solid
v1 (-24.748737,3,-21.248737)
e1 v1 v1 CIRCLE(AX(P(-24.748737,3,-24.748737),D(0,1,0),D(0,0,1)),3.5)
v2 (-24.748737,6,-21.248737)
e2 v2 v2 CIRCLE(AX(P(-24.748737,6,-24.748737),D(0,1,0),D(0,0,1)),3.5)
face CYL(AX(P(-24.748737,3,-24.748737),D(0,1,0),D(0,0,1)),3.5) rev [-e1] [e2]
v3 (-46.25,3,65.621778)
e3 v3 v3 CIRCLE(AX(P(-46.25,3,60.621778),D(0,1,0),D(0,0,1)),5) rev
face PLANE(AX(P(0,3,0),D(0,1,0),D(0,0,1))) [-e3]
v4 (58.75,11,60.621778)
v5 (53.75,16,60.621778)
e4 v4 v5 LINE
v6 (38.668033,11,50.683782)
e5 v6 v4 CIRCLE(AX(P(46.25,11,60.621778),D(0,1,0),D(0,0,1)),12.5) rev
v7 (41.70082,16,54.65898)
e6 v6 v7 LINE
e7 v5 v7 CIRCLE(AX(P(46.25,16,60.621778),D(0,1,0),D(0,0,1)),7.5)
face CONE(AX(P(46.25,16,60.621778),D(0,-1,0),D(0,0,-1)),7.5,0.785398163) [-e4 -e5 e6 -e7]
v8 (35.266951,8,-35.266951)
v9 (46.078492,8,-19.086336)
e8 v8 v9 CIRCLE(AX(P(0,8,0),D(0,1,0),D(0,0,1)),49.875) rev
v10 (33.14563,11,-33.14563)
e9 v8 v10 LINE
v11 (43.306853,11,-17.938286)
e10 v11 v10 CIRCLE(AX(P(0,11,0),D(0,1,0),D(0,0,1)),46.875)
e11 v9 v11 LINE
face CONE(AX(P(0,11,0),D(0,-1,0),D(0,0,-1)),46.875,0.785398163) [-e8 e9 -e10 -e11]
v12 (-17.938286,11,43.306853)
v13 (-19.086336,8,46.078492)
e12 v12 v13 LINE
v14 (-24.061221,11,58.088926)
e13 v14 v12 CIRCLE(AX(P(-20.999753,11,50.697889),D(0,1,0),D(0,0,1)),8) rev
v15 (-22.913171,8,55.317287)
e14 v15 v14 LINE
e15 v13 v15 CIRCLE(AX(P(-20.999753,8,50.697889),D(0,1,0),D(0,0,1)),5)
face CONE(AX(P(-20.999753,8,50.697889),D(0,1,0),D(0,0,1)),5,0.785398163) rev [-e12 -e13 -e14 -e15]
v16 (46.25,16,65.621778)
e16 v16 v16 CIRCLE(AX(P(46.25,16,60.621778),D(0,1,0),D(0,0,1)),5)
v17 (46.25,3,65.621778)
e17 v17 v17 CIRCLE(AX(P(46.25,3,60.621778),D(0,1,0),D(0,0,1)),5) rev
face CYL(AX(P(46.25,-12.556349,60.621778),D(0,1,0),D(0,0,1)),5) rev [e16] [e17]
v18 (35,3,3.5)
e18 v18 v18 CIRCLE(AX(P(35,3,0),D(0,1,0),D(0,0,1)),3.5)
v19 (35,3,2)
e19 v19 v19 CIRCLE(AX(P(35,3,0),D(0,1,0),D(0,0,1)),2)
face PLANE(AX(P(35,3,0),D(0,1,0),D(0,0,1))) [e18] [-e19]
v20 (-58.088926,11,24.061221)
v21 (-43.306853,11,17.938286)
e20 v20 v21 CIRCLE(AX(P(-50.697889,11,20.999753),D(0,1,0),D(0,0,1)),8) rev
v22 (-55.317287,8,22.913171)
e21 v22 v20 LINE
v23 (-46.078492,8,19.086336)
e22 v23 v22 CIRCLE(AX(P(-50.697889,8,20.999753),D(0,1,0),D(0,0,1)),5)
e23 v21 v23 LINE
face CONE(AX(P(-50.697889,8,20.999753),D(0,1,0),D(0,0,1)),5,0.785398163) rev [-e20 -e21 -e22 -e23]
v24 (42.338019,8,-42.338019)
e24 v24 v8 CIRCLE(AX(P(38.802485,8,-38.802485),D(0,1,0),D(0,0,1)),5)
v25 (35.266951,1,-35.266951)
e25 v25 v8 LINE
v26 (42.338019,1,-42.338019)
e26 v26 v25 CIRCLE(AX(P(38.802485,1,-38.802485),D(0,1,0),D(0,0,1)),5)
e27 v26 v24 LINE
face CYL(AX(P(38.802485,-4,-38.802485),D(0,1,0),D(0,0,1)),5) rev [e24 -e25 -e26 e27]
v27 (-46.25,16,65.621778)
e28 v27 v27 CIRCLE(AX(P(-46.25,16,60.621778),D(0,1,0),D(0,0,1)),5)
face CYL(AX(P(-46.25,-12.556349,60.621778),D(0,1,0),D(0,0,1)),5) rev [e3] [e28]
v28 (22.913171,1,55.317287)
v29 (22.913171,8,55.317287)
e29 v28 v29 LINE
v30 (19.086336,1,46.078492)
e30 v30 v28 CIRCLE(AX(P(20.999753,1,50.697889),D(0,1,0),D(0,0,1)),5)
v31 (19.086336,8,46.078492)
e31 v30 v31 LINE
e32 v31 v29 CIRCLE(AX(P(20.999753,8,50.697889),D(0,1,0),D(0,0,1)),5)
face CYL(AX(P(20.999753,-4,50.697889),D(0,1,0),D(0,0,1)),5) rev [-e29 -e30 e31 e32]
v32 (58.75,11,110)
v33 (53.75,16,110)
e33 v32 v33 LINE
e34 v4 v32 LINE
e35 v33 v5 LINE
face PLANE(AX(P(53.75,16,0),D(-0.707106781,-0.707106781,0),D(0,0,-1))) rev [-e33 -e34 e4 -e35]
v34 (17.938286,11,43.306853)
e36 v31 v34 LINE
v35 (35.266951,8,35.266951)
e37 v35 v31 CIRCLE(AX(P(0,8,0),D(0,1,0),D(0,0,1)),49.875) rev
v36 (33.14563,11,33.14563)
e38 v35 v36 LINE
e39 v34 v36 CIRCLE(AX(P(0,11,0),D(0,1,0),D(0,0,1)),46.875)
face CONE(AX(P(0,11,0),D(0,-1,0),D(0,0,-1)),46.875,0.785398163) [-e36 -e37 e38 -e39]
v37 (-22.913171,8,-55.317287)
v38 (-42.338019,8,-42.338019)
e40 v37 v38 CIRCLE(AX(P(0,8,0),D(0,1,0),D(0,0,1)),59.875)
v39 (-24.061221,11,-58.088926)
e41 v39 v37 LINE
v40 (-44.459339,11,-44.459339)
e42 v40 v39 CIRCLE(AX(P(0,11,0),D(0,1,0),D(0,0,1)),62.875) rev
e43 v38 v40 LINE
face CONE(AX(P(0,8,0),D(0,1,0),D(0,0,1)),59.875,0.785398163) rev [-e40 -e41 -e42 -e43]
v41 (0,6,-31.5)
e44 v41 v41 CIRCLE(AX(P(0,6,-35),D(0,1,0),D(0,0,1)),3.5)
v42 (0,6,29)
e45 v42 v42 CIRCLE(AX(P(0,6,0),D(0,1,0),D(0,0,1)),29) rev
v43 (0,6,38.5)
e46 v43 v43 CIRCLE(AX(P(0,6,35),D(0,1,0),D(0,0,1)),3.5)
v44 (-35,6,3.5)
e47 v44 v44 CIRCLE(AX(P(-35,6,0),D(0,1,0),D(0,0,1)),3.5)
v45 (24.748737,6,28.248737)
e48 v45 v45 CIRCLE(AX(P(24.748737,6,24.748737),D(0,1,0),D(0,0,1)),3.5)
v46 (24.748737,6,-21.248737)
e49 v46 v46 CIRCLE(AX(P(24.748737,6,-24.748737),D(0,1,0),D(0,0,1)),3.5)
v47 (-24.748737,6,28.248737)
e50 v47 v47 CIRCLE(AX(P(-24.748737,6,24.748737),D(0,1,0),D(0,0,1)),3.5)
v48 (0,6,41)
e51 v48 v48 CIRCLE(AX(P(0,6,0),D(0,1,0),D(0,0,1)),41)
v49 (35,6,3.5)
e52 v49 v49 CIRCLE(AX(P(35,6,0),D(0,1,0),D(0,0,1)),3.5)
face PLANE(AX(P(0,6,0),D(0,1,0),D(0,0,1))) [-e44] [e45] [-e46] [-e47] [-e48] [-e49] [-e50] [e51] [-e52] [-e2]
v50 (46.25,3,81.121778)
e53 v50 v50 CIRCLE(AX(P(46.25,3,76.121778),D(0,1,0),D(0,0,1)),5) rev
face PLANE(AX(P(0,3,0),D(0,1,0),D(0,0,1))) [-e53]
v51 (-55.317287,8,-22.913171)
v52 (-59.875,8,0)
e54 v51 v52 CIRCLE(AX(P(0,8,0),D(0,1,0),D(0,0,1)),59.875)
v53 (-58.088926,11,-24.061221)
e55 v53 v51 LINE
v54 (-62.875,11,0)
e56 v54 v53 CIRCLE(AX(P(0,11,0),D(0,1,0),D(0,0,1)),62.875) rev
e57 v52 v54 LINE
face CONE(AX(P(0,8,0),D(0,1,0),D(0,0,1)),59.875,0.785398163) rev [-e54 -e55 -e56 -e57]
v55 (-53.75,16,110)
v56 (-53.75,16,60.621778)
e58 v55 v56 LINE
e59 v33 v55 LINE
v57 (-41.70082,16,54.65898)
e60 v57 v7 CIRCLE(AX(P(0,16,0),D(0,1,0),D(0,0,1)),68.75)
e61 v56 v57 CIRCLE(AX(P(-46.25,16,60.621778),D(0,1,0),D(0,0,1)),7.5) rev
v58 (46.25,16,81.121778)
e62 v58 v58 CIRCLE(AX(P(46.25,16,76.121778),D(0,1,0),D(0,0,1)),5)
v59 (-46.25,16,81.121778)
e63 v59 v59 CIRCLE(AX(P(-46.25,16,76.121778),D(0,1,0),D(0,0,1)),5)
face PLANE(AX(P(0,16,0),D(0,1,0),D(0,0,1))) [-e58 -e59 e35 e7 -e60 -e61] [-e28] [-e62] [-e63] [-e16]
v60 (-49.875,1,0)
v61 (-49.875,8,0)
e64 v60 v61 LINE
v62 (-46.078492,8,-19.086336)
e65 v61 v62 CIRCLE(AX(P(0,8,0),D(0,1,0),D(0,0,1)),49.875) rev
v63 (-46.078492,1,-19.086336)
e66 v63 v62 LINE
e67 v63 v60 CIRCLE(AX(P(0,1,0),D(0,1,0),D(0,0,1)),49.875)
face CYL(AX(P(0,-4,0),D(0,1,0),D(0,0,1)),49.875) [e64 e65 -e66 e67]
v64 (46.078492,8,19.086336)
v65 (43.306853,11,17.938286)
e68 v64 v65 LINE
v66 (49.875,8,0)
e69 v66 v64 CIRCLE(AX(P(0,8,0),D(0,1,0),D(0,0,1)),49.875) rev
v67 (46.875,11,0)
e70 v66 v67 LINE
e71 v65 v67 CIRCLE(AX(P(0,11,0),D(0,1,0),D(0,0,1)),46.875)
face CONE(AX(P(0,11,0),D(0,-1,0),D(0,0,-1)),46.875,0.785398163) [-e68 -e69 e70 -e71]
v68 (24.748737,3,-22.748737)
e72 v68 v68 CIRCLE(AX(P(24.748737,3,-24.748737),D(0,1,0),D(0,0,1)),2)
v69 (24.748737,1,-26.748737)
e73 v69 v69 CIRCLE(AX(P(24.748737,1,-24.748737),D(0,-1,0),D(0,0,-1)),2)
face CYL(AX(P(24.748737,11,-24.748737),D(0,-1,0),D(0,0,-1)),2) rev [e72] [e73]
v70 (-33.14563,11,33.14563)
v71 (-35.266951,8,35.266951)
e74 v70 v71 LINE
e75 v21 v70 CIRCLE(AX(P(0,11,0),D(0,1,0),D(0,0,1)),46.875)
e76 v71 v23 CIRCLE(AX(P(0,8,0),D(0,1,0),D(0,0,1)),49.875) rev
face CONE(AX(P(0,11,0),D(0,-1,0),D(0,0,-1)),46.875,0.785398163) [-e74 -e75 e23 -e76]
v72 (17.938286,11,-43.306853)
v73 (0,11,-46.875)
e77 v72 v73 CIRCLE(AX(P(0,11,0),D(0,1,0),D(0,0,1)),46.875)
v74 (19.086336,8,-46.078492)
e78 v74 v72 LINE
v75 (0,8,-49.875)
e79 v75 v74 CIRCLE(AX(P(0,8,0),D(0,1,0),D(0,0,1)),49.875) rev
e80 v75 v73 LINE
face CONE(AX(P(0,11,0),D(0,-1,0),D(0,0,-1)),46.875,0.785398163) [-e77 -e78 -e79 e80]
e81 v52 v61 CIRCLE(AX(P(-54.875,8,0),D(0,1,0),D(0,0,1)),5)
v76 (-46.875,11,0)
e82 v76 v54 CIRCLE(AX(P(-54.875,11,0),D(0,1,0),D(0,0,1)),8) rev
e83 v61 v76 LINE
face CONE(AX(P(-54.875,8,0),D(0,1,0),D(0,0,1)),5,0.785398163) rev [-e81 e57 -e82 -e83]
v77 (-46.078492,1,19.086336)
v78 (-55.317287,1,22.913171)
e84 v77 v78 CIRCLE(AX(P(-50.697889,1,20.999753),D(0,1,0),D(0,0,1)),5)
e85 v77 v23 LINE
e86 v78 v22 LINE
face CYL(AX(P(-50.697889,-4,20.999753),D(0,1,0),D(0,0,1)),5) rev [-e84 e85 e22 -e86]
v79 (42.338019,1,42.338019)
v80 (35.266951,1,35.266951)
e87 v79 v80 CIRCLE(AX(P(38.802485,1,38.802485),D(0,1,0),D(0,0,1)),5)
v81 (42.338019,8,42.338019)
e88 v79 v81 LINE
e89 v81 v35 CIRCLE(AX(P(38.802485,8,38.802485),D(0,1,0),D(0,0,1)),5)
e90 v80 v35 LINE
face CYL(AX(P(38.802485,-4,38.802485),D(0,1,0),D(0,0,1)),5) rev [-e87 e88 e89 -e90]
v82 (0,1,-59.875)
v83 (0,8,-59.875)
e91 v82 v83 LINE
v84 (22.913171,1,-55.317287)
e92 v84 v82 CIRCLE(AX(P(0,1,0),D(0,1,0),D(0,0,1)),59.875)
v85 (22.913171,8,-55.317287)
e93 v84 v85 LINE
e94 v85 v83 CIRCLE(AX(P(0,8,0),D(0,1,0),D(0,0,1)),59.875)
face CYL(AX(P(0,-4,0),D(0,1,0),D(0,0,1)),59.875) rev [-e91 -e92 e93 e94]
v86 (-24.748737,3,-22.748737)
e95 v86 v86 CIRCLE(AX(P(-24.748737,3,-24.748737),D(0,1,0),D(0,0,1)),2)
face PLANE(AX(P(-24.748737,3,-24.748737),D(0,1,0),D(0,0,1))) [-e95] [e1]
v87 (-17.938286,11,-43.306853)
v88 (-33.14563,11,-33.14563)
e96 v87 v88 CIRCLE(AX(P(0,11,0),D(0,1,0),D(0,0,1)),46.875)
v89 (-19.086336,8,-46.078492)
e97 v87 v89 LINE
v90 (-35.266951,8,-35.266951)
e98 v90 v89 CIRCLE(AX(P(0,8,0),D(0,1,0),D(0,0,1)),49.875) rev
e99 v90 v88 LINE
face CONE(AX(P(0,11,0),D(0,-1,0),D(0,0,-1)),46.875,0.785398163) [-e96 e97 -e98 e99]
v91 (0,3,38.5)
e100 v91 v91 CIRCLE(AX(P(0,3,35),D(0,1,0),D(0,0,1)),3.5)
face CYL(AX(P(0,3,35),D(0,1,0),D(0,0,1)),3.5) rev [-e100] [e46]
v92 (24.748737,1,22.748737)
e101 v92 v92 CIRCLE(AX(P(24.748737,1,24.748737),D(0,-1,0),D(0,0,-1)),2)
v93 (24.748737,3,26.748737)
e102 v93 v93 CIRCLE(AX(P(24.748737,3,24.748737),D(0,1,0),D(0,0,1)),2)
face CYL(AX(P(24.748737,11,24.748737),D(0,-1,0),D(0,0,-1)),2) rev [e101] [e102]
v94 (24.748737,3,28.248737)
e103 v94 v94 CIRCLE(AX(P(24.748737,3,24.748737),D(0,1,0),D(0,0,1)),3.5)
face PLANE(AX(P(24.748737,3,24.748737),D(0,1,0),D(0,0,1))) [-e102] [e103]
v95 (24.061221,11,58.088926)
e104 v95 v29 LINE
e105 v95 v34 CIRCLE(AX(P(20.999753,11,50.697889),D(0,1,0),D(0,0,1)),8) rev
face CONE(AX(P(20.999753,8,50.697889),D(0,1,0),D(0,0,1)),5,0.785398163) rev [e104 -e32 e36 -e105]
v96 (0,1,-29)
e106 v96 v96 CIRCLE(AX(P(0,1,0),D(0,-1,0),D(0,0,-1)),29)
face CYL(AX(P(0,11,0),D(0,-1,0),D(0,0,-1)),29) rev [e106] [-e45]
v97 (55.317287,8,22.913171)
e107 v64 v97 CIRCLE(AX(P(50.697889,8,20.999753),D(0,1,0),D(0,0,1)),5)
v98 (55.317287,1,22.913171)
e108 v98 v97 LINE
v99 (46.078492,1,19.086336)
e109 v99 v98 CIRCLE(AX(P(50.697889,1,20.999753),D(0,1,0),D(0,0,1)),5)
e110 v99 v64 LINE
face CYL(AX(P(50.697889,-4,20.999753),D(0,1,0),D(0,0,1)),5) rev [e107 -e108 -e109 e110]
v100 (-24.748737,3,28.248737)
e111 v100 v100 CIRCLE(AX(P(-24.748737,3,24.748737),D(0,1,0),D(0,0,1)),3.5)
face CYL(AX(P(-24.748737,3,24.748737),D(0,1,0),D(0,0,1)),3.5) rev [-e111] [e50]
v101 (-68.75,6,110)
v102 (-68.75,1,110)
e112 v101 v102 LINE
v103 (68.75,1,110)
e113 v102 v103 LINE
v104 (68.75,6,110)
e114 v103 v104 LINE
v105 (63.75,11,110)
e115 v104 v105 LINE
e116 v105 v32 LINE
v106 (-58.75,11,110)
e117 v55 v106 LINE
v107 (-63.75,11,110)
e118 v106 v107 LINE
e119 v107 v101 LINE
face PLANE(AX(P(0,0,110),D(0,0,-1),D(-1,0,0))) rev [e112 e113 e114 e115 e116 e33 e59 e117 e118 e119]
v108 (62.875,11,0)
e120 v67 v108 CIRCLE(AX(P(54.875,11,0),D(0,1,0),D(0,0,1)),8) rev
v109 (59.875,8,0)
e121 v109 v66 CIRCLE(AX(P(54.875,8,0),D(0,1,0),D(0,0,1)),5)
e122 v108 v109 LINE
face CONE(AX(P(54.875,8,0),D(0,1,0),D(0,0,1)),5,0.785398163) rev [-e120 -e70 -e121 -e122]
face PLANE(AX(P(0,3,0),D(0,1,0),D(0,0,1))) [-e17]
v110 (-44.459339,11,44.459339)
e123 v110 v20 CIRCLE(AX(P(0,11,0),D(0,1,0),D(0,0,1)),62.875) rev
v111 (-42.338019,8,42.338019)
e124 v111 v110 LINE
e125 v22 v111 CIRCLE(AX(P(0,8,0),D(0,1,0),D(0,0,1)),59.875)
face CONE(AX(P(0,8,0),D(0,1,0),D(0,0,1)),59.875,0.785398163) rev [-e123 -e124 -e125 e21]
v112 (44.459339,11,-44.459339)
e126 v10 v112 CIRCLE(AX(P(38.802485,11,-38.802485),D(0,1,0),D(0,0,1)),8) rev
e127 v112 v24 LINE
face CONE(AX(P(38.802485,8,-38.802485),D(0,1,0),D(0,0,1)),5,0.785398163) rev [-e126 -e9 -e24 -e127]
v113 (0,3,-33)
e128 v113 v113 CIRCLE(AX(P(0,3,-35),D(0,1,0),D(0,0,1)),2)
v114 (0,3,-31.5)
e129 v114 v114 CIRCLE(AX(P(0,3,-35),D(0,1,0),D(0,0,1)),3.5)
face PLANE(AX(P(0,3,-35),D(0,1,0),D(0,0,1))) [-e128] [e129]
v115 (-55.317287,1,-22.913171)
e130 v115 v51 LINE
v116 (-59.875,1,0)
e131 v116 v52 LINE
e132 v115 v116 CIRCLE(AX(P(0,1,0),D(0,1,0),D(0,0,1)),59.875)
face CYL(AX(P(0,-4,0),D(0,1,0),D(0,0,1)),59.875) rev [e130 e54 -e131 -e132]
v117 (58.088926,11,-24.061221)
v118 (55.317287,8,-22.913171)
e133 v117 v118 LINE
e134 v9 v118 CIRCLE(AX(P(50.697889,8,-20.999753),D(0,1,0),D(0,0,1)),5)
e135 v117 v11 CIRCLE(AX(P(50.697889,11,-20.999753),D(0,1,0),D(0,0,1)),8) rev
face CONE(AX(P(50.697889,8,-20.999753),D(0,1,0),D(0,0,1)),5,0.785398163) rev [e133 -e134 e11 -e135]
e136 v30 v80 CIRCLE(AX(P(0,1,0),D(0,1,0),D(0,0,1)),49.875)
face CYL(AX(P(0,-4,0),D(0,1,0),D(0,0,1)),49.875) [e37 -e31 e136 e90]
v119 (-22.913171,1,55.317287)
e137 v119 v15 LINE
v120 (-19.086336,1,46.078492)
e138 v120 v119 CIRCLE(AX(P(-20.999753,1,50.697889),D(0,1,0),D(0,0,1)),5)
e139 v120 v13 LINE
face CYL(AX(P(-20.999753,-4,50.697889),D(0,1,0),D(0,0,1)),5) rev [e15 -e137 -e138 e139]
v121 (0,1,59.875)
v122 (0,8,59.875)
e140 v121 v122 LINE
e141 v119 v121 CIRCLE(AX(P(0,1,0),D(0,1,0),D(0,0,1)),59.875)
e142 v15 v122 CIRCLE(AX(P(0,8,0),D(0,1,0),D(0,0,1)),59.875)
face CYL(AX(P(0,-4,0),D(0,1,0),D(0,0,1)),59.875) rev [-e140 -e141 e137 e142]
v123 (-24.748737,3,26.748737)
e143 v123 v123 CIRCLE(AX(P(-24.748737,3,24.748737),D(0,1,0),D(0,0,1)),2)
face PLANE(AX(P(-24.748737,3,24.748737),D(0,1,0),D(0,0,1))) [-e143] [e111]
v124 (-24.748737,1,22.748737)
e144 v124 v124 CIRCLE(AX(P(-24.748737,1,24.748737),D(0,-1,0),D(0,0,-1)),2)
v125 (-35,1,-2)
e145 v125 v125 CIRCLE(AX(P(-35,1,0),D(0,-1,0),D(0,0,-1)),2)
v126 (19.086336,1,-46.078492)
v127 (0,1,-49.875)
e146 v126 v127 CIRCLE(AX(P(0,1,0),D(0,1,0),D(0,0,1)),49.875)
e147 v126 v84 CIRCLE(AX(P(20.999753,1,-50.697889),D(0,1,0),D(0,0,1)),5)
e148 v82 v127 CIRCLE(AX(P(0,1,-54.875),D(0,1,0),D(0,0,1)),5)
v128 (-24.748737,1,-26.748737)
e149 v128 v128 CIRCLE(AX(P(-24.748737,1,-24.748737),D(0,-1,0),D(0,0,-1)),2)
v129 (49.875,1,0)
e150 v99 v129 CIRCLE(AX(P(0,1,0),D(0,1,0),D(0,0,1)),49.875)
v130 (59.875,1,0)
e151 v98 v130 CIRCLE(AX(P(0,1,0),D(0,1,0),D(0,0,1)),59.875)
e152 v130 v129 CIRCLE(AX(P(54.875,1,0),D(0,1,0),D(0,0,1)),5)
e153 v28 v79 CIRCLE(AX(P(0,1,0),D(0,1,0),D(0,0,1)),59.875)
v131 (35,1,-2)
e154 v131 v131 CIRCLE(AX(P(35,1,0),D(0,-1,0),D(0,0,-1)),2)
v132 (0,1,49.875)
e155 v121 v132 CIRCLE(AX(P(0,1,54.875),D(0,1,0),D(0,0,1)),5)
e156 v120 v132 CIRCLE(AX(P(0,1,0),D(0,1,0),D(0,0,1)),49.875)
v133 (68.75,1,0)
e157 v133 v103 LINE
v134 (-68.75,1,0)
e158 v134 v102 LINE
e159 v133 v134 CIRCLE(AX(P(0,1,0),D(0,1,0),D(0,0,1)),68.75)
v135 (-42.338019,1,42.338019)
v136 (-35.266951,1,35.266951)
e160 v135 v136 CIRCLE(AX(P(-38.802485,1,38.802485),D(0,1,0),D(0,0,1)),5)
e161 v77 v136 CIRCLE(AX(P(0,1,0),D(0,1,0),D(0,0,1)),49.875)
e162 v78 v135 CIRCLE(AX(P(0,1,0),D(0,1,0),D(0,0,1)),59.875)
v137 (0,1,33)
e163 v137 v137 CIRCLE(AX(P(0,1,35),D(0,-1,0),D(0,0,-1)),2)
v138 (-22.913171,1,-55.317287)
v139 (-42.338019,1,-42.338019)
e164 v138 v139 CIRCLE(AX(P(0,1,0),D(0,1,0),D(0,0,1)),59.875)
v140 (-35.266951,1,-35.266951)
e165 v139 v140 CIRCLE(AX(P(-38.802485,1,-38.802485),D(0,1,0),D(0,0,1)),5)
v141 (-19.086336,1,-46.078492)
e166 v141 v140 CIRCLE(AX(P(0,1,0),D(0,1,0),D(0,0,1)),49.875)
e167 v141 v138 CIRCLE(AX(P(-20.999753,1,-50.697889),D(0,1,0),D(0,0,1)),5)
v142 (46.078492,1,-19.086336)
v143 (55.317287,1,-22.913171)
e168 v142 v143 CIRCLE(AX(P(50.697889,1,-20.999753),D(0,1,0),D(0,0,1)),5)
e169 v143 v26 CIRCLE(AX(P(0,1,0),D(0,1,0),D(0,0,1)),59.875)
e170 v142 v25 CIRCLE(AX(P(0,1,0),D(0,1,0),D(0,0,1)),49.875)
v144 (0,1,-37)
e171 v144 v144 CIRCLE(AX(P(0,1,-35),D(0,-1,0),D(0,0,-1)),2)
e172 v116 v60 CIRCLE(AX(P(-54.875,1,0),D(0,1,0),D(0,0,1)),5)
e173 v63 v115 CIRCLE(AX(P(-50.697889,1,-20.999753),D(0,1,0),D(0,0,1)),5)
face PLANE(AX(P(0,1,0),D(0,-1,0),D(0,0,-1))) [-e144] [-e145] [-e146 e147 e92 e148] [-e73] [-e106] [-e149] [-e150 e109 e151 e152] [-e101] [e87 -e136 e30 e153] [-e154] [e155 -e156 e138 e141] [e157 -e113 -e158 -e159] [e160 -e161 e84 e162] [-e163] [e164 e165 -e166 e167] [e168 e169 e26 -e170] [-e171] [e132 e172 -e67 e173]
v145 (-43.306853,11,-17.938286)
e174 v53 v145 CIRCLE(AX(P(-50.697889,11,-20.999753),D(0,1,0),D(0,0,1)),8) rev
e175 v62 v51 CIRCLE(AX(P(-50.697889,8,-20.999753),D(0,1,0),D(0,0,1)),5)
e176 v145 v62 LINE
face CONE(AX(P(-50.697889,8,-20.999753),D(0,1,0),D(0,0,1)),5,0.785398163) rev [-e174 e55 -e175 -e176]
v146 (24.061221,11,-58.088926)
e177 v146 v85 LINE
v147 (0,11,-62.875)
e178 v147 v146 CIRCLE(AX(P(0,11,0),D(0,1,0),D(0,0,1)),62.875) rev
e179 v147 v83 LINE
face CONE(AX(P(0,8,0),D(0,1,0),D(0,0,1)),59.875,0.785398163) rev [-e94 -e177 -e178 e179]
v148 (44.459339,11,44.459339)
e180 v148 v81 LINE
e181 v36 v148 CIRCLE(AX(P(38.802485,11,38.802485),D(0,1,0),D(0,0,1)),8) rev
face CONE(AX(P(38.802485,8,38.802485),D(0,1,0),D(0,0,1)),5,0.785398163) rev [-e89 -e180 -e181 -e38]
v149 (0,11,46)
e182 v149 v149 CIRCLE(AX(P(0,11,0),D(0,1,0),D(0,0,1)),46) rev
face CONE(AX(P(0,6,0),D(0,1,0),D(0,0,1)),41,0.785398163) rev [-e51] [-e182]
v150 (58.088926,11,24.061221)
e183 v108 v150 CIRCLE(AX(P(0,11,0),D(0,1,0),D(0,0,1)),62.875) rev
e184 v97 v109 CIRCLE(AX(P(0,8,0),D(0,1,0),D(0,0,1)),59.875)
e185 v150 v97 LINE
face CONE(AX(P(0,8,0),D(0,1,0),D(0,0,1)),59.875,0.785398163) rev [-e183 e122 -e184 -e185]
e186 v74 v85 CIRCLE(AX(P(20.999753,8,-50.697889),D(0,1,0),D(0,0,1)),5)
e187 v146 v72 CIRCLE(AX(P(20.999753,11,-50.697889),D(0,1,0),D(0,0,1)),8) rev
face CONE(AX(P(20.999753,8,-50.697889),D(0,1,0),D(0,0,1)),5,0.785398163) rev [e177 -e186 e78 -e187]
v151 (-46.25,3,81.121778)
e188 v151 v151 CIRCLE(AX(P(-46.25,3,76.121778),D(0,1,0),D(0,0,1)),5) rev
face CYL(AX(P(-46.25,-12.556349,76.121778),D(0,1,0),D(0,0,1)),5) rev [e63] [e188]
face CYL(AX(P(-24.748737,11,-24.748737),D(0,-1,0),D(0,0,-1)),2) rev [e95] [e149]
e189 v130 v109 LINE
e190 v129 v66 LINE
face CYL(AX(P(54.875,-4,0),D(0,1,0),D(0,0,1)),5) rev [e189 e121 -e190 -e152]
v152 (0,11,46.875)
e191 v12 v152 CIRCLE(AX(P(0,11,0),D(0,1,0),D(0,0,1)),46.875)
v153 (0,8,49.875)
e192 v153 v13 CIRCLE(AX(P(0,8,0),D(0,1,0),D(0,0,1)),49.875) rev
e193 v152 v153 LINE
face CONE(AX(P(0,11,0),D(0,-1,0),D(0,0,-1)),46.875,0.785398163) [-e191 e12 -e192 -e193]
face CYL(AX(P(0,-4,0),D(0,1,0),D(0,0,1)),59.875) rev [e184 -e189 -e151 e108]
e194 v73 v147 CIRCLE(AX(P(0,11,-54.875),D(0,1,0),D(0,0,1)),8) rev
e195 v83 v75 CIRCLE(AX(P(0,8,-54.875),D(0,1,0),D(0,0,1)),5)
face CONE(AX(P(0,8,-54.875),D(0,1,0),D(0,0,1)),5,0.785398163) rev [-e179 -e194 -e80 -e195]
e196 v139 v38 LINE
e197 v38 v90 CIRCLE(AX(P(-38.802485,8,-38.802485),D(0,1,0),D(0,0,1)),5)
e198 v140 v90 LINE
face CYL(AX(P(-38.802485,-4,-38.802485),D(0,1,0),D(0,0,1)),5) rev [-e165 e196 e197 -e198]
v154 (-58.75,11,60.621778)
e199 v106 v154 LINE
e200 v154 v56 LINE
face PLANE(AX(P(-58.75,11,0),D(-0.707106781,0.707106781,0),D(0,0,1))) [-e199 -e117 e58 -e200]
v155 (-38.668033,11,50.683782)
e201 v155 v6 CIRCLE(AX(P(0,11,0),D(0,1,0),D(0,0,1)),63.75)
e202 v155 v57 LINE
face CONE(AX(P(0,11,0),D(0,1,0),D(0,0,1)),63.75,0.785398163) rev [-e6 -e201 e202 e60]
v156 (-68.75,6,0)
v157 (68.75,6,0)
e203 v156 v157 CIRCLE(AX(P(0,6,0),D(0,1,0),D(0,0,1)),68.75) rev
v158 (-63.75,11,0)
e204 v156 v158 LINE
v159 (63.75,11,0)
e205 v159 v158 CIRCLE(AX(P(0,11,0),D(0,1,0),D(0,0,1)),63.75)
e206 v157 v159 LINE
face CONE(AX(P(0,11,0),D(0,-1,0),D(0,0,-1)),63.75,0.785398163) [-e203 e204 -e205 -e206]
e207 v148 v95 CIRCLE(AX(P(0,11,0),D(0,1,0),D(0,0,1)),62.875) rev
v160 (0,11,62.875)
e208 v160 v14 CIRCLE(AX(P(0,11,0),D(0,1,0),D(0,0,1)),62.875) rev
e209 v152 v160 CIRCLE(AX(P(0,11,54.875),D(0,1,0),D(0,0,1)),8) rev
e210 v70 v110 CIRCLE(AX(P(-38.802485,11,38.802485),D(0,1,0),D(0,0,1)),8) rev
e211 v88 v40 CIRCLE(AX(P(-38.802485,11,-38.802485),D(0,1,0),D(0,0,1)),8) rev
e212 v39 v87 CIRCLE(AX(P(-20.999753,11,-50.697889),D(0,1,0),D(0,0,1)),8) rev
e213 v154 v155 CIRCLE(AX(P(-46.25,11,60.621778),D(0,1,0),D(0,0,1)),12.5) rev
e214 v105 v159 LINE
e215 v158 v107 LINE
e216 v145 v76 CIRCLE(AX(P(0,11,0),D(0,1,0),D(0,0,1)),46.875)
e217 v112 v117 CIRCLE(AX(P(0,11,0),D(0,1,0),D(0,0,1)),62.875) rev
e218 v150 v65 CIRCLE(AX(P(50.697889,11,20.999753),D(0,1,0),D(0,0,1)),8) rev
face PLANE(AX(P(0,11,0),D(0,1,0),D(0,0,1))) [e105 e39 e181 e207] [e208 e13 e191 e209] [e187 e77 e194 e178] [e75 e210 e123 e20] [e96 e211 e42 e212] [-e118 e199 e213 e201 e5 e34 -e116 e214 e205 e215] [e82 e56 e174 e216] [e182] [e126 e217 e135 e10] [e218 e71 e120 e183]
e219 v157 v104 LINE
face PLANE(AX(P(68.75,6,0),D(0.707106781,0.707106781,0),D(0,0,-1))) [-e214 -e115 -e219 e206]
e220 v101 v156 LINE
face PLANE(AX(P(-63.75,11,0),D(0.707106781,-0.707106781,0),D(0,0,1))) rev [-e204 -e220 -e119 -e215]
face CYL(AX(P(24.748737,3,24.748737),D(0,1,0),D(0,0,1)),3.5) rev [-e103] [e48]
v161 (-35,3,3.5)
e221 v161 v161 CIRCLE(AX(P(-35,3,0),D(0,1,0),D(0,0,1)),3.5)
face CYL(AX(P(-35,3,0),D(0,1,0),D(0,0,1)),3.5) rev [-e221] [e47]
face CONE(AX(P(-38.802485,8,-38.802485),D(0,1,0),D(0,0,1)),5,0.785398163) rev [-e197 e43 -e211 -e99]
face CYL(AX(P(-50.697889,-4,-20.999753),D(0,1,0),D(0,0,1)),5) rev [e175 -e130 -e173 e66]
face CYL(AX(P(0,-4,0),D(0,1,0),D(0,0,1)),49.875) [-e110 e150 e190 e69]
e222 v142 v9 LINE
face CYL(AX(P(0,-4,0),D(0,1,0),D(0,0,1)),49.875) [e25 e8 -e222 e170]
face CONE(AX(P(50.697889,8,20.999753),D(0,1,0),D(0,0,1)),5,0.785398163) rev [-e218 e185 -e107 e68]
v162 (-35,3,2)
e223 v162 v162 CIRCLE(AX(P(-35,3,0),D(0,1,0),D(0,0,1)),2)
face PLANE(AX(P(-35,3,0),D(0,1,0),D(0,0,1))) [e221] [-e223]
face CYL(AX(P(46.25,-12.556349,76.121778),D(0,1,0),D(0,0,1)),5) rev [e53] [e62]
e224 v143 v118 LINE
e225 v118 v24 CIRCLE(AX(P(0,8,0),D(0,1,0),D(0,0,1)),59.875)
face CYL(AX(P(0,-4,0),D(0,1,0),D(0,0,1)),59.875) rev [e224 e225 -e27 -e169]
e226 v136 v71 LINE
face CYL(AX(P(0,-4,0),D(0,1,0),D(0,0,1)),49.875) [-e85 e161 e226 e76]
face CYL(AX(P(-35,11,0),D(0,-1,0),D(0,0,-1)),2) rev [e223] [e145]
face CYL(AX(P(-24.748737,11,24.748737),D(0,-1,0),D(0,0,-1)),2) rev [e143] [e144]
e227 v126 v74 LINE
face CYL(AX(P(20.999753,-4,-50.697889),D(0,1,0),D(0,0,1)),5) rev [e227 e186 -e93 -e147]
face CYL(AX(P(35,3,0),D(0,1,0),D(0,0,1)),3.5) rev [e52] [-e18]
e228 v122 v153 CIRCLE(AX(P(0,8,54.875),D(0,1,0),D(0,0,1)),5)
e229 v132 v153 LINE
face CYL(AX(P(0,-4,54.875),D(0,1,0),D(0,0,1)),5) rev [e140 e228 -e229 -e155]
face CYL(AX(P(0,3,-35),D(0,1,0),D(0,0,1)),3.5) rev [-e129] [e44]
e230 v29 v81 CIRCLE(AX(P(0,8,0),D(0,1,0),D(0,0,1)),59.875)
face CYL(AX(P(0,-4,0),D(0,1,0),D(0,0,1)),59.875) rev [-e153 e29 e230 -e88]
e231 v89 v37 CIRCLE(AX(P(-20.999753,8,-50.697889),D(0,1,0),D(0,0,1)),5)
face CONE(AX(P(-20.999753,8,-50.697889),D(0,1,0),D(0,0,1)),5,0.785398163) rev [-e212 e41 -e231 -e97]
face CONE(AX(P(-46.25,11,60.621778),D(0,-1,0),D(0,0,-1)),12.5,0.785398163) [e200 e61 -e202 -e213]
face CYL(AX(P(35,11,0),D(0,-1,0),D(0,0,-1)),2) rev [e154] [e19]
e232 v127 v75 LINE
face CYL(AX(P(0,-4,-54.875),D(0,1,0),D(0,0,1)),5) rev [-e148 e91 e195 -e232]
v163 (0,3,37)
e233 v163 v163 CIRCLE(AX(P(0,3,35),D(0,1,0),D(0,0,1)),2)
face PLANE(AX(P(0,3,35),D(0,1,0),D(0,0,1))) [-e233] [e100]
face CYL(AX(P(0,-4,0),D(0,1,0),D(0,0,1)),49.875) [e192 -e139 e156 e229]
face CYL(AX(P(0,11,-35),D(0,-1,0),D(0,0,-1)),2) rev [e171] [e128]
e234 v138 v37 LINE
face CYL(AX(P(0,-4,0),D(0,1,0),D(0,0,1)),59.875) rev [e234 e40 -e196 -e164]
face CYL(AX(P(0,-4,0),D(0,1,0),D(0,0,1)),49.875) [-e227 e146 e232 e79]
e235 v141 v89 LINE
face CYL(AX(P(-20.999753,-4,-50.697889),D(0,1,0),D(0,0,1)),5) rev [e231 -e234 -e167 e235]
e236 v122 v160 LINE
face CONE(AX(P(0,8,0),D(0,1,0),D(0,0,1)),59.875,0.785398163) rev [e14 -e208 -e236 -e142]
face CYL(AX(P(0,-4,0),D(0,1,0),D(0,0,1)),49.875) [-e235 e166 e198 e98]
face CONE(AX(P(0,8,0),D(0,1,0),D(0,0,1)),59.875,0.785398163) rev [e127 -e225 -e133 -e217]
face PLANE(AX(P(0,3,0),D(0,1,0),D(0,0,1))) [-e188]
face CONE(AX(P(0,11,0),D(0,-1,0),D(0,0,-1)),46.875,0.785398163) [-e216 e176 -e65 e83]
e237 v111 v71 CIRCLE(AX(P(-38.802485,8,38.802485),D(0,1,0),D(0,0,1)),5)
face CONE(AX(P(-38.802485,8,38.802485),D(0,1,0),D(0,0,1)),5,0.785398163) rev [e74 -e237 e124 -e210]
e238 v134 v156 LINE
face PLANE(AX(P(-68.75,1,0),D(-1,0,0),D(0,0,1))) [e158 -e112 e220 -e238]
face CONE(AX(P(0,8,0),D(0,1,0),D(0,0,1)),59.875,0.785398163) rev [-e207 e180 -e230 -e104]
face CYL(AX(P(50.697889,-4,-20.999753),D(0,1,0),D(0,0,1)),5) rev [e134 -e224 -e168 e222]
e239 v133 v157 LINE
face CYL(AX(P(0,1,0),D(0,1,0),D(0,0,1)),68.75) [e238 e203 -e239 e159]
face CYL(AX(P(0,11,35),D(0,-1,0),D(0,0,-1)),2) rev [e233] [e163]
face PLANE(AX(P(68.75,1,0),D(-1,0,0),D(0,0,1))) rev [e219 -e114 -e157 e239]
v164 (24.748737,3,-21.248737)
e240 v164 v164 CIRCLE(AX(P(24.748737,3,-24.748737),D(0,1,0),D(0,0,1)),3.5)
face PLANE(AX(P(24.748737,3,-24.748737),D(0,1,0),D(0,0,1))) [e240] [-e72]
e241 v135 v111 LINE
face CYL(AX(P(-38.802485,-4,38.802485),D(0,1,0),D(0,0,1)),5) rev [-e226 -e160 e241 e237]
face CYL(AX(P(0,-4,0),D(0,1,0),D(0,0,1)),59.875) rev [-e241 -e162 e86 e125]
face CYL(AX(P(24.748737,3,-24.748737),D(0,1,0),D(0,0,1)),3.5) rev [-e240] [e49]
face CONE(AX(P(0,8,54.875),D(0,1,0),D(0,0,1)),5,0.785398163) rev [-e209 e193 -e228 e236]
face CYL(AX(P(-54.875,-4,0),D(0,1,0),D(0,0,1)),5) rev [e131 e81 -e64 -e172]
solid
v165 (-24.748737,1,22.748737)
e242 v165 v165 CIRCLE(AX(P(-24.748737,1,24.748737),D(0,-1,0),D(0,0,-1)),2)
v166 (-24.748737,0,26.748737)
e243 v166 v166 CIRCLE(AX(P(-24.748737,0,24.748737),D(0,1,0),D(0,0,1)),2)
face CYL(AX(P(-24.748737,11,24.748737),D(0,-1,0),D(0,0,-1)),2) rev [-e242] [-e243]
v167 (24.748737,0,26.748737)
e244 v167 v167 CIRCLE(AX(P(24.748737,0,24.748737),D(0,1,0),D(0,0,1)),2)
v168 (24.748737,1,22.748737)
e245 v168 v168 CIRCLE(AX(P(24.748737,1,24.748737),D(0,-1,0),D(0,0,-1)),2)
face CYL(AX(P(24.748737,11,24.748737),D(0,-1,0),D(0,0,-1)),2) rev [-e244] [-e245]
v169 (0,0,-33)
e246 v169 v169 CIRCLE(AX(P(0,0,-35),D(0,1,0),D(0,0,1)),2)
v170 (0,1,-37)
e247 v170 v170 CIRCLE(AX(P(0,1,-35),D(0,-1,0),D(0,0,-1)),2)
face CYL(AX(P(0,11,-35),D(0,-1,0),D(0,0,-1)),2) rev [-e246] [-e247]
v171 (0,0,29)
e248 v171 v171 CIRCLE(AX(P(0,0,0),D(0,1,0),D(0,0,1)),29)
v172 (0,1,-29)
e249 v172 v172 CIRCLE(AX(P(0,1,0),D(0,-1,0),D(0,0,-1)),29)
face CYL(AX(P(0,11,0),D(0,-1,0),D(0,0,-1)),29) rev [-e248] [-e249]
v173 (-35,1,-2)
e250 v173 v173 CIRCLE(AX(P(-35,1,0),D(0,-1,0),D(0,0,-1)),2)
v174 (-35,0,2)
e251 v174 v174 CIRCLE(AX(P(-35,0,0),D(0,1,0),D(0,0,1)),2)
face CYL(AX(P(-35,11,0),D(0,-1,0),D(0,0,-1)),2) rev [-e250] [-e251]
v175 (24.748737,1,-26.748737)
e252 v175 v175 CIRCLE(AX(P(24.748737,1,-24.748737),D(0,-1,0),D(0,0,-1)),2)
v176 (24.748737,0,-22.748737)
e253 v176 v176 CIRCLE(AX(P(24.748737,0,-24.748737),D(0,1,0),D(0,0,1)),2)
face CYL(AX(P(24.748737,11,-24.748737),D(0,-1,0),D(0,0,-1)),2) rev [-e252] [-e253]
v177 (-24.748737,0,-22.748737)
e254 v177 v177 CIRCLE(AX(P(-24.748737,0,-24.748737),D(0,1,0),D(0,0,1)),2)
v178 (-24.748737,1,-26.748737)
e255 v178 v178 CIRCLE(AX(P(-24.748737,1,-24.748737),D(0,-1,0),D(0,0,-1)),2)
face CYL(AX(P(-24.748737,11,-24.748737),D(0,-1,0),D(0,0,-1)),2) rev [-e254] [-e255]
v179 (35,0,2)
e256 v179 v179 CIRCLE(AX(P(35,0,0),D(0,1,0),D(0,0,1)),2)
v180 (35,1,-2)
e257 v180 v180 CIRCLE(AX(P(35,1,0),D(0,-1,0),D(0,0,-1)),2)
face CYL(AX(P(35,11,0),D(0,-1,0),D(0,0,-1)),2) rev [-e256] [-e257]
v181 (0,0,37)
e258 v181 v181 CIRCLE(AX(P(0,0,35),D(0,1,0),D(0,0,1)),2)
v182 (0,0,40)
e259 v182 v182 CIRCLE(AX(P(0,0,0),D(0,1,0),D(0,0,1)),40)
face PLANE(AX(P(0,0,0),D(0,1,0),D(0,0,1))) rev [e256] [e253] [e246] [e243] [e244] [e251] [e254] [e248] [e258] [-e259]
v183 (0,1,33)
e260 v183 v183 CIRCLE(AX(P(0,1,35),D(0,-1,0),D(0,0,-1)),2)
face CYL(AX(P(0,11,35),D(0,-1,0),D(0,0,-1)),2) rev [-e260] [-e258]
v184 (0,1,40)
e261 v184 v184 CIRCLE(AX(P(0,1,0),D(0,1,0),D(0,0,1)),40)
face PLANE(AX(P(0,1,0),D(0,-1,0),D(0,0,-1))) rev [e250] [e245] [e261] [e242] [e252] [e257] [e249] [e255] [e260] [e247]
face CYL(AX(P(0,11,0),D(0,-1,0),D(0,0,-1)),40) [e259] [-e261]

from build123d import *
from build123d.topology import SkipClean

# Parameters (mm, degrees)
SKETCH1_R           = 40
SKETCH1_R_2         = 2
SKETCH1_R_3         = 29
BOSS_EXTRUDE1_DEPTH = 11
BOSS_EXTRUDE2_START = -10
SKETCH3_R           = 40
BOSS_EXTRUDE2_DEPTH = 10
SKETCH4_R           = 41
CUT_EXTRUDE2_DEPTH  = 5
CHAMFER2_SIZE       = 5
CHAMFER4_SIZE       = 5
CUT_EXTRUDE4_DEPTH  = 15
CHAMFER5_SIZE       = 3
SKETCH8_R           = 3.5
CUT_EXTRUDE5_DEPTH  = 3
BOSS_EXTRUDE3_DEPTH = 5
CHAMFER6_SIZE       = 5
BOSS_EXTRUDE4_DEPTH = 10
SKETCH14_R          = 5.5
CUT_EXTRUDE6_DEPTH  = 13
SKETCH15_R          = 5.5
SKETCH15_R_2        = 5
BOSS_EXTRUDE5_DEPTH = 13


# Read off the part's stored shape, not the designer's step: Intersect1
with BuildPart() as part:
    # Sketch1 → Boss-Extrude1 (new body)
    with BuildSketch(Plane(origin=(0, 0, 0), x_dir=(1, 0, 0), z_dir=(0, 1, 0))):
        with Locations(Location((0, 0, 0), (0, 0, 270))):
            Circle(SKETCH1_R)
        with Locations(Location((35, 0, 0), (0, 0, 270))):
            Circle(SKETCH1_R_2, mode=Mode.SUBTRACT)
        with Locations(Location((24.748737342, -24.748737342, 0), (0, 0, 270))):
            Circle(SKETCH1_R_2, mode=Mode.SUBTRACT)
        with Locations(Location((0, -35, 0), (0, 0, 270))):
            Circle(SKETCH1_R_2, mode=Mode.SUBTRACT)
        with Locations(Location((-24.748737342, -24.748737342, 0), (0, 0, 270))):
            Circle(SKETCH1_R_2, mode=Mode.SUBTRACT)
        with Locations(Location((-35, 0, 0), (0, 0, 270))):
            Circle(SKETCH1_R_2, mode=Mode.SUBTRACT)
        with Locations(Location((-24.748737342, 24.748737342, 0), (0, 0, 270))):
            Circle(SKETCH1_R_2, mode=Mode.SUBTRACT)
        with Locations(Location((0, 35, 0), (0, 0, 270))):
            Circle(SKETCH1_R_2, mode=Mode.SUBTRACT)
        with Locations(Location((24.748737342, 24.748737342, 0), (0, 0, 270))):
            Circle(SKETCH1_R_2, mode=Mode.SUBTRACT)
        with Locations(Location((0, 0, 0), (0, 0, 270))):
            Circle(SKETCH1_R_3, mode=Mode.SUBTRACT)
    extrude(amount=BOSS_EXTRUDE1_DEPTH)

    # Sketch3 → Boss-Extrude2 (add)
    with BuildSketch(Plane(origin=(0, 11, 0), x_dir=(1, 0, 0), z_dir=(0, 1, 0)).offset(BOSS_EXTRUDE2_START)):
        with BuildLine():
            Line((68.75, 0), (68.75, -100))
            Line((68.75, -100), (0, -100))
            Line((0, -100), (-68.75, -100))
            Line((-68.75, -100), (-68.75, 0))
            ThreePointArc((-68.75, 0), (0, 68.75), (68.75, 0))
        make_face()
        with Locations(Location((0, 0, 0), (0, 0, 270))):
            Circle(SKETCH3_R, mode=Mode.SUBTRACT)
    extrude(amount=BOSS_EXTRUDE2_DEPTH)

    # Sketch4 → Cut-Extrude2 (cut)
    with BuildSketch(Plane(origin=(0, 11, 0), x_dir=(1, 0, 0), z_dir=(0, 1, 0))):
        with Locations(Location((0, 0, 0), (0, 0, 270))):
            Circle(SKETCH4_R)
    extrude(amount=-CUT_EXTRUDE2_DEPTH, mode=Mode.SUBTRACT)

    # Chamfer2
    chamfer2_edges = [part.edges().sort_by_distance(p)[0] for p in [
        (0, 11, -41),
    ]]
    chamfer(chamfer2_edges, length=CHAMFER2_SIZE - 0.0001)  # a hair under: the kernel refuses the full size

    # Chamfer4
    chamfer4_edges = [part.edges().sort_by_distance(p)[0] for p in [
        (68.75, 11, 50),
        (0, 11, -68.75),
        (-68.75, 11, 50),
    ]]
    chamfer(chamfer4_edges, length=CHAMFER4_SIZE)

    # Sketch7 → Cut-Extrude4 (cut)
    with BuildSketch(Plane(origin=(0, 11, 0), x_dir=(1, 0, 0), z_dir=(0, 1, 0))):
        with BuildLine():
            ThreePointArc((-55.317287009, 22.913170513), (-58.724518664, 11.681033031), (-59.875, 0))
            ThreePointArc((-59.875, 0), (-54.875, -5), (-49.875, 0))
            ThreePointArc((-49.875, 0), (-48.91666586, 9.730129811), (-46.078491684, 19.086336189))
            ThreePointArc((-46.078491684, 19.086336189), (-48.784472185, 25.619151014), (-55.317287009, 22.913170513))
        make_face()
        with BuildLine():
            ThreePointArc((-22.913170513, 55.317287009), (-33.264767702, 49.784243037), (-42.338018524, 42.338018524))
            ThreePointArc((-42.338018524, 42.338018524), (-42.338018524, 35.266950712), (-35.266950712, 35.266950712))
            ThreePointArc((-35.266950712, 35.266950712), (-27.709065372, 41.469546914), (-19.086336189, 46.078491684))
            ThreePointArc((-19.086336189, 46.078491684), (-16.380355688, 52.611306508), (-22.913170513, 55.317287009))
        make_face()
        with BuildLine():
            ThreePointArc((22.913170513, 55.317287009), (11.681033031, 58.724518664), (0, 59.875))
            ThreePointArc((0, 59.875), (-5, 54.875), (0, 49.875))
            ThreePointArc((0, 49.875), (9.730129811, 48.91666586), (19.086336189, 46.078491684))
            ThreePointArc((19.086336189, 46.078491684), (25.619151014, 48.784472185), (22.913170513, 55.317287009))
        make_face()
        with BuildLine():
            ThreePointArc((55.317287009, 22.913170513), (49.784243037, 33.264767702), (42.338018524, 42.338018524))
            ThreePointArc((42.338018524, 42.338018524), (35.266950712, 42.338018524), (35.266950712, 35.266950712))
            ThreePointArc((35.266950712, 35.266950712), (41.469546914, 27.709065372), (46.078491684, 19.086336189))
            ThreePointArc((46.078491684, 19.086336189), (52.611306508, 16.380355688), (55.317287009, 22.913170513))
        make_face()
        with BuildLine():
            ThreePointArc((55.317287009, -22.913170513), (58.724518664, -11.681033031), (59.875, 0))
            ThreePointArc((59.875, 0), (54.875, 5), (49.875, 0))
            ThreePointArc((49.875, 0), (48.91666586, -9.730129811), (46.078491684, -19.086336189))
            ThreePointArc((46.078491684, -19.086336189), (48.784472185, -25.619151014), (55.317287009, -22.913170513))
        make_face()
        with BuildLine():
            ThreePointArc((22.913170513, -55.317287009), (33.264767702, -49.784243037), (42.338018524, -42.338018524))
            ThreePointArc((42.338018524, -42.338018524), (42.338018524, -35.266950712), (35.266950712, -35.266950712))
            ThreePointArc((35.266950712, -35.266950712), (27.709065372, -41.469546914), (19.086336189, -46.078491684))
            ThreePointArc((19.086336189, -46.078491684), (16.380355688, -52.611306508), (22.913170513, -55.317287009))
        make_face()
        with BuildLine():
            ThreePointArc((-22.913170513, -55.317287009), (-11.681033031, -58.724518664), (0, -59.875))
            ThreePointArc((0, -59.875), (5, -54.875), (0, -49.875))
            ThreePointArc((0, -49.875), (-9.730129811, -48.91666586), (-19.086336189, -46.078491684))
            ThreePointArc((-19.086336189, -46.078491684), (-25.619151014, -48.784472185), (-22.913170513, -55.317287009))
        make_face()
        with BuildLine():
            ThreePointArc((-55.317287009, -22.913170513), (-49.784243037, -33.264767702), (-42.338018524, -42.338018524))
            ThreePointArc((-42.338018524, -42.338018524), (-35.266950712, -42.338018524), (-35.266950712, -35.266950712))
            ThreePointArc((-35.266950712, -35.266950712), (-41.469546914, -27.709065372), (-46.078491684, -19.086336189))
            ThreePointArc((-46.078491684, -19.086336189), (-52.611306508, -16.380355688), (-55.317287009, -22.913170513))
        make_face()
    extrude(amount=-CUT_EXTRUDE4_DEPTH, mode=Mode.SUBTRACT)

    # Chamfer5
    chamfer5_edges = [part.edges().sort_by_distance(p)[0] for p in [
        (9.730129811, 11, -48.91666586),
        (25.619151014, 11, -48.784472185),
        (11.681033031, 11, -58.724518664),
        (-5, 11, -54.875),
        (41.469546914, 11, -27.709065372),
        (52.611306508, 11, -16.380355688),
        (49.784243037, 11, -33.264767702),
        (35.266950712, 11, -42.338018524),
        (48.91666586, 11, 9.730129811),
        (48.784472185, 11, 25.619151014),
        (58.724518664, 11, 11.681033031),
        (54.875, 11, -5),
        (27.709065372, 11, 41.469546914),
        (16.380355688, 11, 52.611306508),
        (33.264767702, 11, 49.784243037),
        (42.338018524, 11, 35.266950712),
        (-9.730129811, 11, 48.91666586),
        (-25.619151014, 11, 48.784472185),
        (-11.681033031, 11, 58.724518664),
        (5, 11, 54.875),
        (-41.469546914, 11, 27.709065372),
        (-52.611306508, 11, 16.380355688),
        (-49.784243037, 11, 33.264767702),
        (-35.266950712, 11, 42.338018524),
        (-48.91666586, 11, -9.730129811),
        (-48.784472185, 11, -25.619151014),
        (-58.724518664, 11, -11.681033031),
        (-54.875, 11, 5),
        (-27.709065372, 11, -41.469546914),
        (-16.380355688, 11, -52.611306508),
        (-33.264767702, 11, -49.784243037),
        (-42.338018524, 11, -35.266950712),
    ]]
    chamfer(chamfer5_edges, length=CHAMFER5_SIZE)

    # Sketch8 → Cut-Extrude5 (cut)
    with BuildSketch(Plane(origin=(0, 6, 0), x_dir=(1, 0, 0), z_dir=(0, 1, 0))):
        with Locations(Location((-35, 0, 0), (0, 0, 270))):
            Circle(SKETCH8_R)
        with Locations(Location((-24.748737342, 24.748737342, 0), (0, 0, 270))):
            Circle(SKETCH8_R)
        with Locations(Location((0, 35, 0), (0, 0, 270))):
            Circle(SKETCH8_R)
        with Locations(Location((24.748737342, 24.748737342, 0), (0, 0, 270))):
            Circle(SKETCH8_R)
        with Locations(Location((35, 0, 0), (0, 0, 270))):
            Circle(SKETCH8_R)
        with Locations(Location((24.748737342, -24.748737342, 0), (0, 0, 270))):
            Circle(SKETCH8_R)
        with Locations(Location((0, -35, 0), (0, 0, 270))):
            Circle(SKETCH8_R)
        with Locations(Location((-24.748737342, -24.748737342, 0), (0, 0, 270))):
            Circle(SKETCH8_R)
    extrude(amount=-CUT_EXTRUDE5_DEPTH, mode=Mode.SUBTRACT)

    # Sketch9 → Boss-Extrude3 (add)
    with BuildSketch(Plane(origin=(0, 11, 0), x_dir=(1, 0, 0), z_dir=(0, 1, 0))):
        with BuildLine():
            Line((-53.75, -60.621778265), (-53.75, -100))
            Line((-53.75, -100), (0, -100))
            Line((0, -100), (0, -68.75))
            ThreePointArc((0, -68.75), (-22.008607377, -65.132048189), (-41.700819672, -54.658980403))
            ThreePointArc((-41.700819672, -54.658980403), (-49.576495719, -53.899842068), (-53.75, -60.621778265))
        make_face()
        with BuildLine():
            Line((0, -68.75), (0, -100))
            Line((0, -100), (53.75, -100))
            Line((53.75, -100), (53.75, -60.621778265))
            ThreePointArc((53.75, -60.621778265), (49.576495719, -53.899842068), (41.700819672, -54.658980403))
            ThreePointArc((41.700819672, -54.658980403), (22.008607377, -65.132048189), (0, -68.75))
        make_face()
    extrude(amount=BOSS_EXTRUDE3_DEPTH)

    # Chamfer6
    chamfer6_edges = [part.edges().sort_by_distance(p)[0] for p in [
        (53.75, 11, 80.310889132),
        (49.576495719, 11, 53.899842068),
        (0, 11, 68.75),
        (-49.576495719, 11, 53.899842068),
        (-53.75, 11, 80.310889132),
    ]]
    chamfer(chamfer6_edges, length=CHAMFER6_SIZE - 0.0001)  # a hair under: the kernel refuses the full size


with BuildPart() as body_2:
    # Intersect1: the piece on the far side of the plane
    add(part.part)
    split(bisect_by=Plane(origin=(0, 1, 0), x_dir=(1, 0, 0), z_dir=(0, 1, 0)), keep=Keep.BOTTOM)


with BuildPart() as part_1:
    add(part.part)

    # Intersect1
    split(bisect_by=Plane(origin=(0, 1, 0), x_dir=(1, 0, 0), z_dir=(0, 1, 0)), keep=Keep.TOP)

    # Sketch11 → Boss-Extrude4 (add)
    with SkipClean():  # the faces are left unmerged after this step: merging them gives an invalid solid
        with BuildSketch(Plane.XY.offset(100)):
            Polygon((-68.75, 1), (-68.75, 6), (-63.75, 11), (-58.75, 11), (-53.75, 16), (53.75, 16), (58.75, 11), (63.75, 11), (68.75, 6), (68.75, 1), align=None)
        extrude(amount=BOSS_EXTRUDE4_DEPTH)

    # Sketch14 → Cut-Extrude6 (cut)
    with SkipClean():  # the faces are left unmerged after this step: merging them gives an invalid solid
        with BuildSketch(Plane(origin=(0, 16, 0), x_dir=(1, 0, 0), z_dir=(0, 1, 0))):
            with Locations(Location((-46.25, -60.621778265, 0), (0, 0, 270))):
                Circle(SKETCH14_R)
            with Locations(Location((46.25, -60.621778265, 0), (0, 0, 270))):
                Circle(SKETCH14_R)
            with Locations(Location((-46.25, -76.121778265, 0), (0, 0, 270))):
                Circle(SKETCH14_R)
            with Locations(Location((46.25, -76.121778265, 0), (0, 0, 270))):
                Circle(SKETCH14_R)
        extrude(amount=-CUT_EXTRUDE6_DEPTH, mode=Mode.SUBTRACT)

    # Sketch15 → Boss-Extrude5 (add)
    # profile 1 of 4: a face of its own
    with SkipClean():  # the faces are left unmerged after this step: merging them gives an invalid solid
        with BuildSketch(Plane(origin=(0, 16, 0), x_dir=(1, 0, 0), z_dir=(0, 1, 0))):
            with Locations((46.25, -60.621778265)):
                Circle(SKETCH15_R)
            with Locations(Location((46.25, -60.621778265, 0), (0, 0, 270))):
                Circle(SKETCH15_R_2, mode=Mode.SUBTRACT)
        # profile 2 of 4: a face of its own
        with BuildSketch(Plane(origin=(0, 16, 0), x_dir=(1, 0, 0), z_dir=(0, 1, 0))):
            with Locations((46.25, -76.121778265)):
                Circle(SKETCH15_R)
            with Locations(Location((46.25, -76.121778265, 0), (0, 0, 270))):
                Circle(SKETCH15_R_2, mode=Mode.SUBTRACT)
        # profile 3 of 4: a face of its own
        with BuildSketch(Plane(origin=(0, 16, 0), x_dir=(1, 0, 0), z_dir=(0, 1, 0))):
            with Locations((-46.25, -76.121778265)):
                Circle(SKETCH15_R)
            with Locations(Location((-46.25, -76.121778265, 0), (0, 0, 270))):
                Circle(SKETCH15_R_2, mode=Mode.SUBTRACT)
        # profile 4 of 4: a face of its own
        with BuildSketch(Plane(origin=(0, 16, 0), x_dir=(1, 0, 0), z_dir=(0, 1, 0))):
            with Locations((-46.25, -60.621778265)):
                Circle(SKETCH15_R)
            with Locations(Location((-46.25, -60.621778265, 0), (0, 0, 270))):
                Circle(SKETCH15_R_2, mode=Mode.SUBTRACT)
        extrude(amount=-BOSS_EXTRUDE5_DEPTH)


solid = Compound([body_2.part, part_1.part])
